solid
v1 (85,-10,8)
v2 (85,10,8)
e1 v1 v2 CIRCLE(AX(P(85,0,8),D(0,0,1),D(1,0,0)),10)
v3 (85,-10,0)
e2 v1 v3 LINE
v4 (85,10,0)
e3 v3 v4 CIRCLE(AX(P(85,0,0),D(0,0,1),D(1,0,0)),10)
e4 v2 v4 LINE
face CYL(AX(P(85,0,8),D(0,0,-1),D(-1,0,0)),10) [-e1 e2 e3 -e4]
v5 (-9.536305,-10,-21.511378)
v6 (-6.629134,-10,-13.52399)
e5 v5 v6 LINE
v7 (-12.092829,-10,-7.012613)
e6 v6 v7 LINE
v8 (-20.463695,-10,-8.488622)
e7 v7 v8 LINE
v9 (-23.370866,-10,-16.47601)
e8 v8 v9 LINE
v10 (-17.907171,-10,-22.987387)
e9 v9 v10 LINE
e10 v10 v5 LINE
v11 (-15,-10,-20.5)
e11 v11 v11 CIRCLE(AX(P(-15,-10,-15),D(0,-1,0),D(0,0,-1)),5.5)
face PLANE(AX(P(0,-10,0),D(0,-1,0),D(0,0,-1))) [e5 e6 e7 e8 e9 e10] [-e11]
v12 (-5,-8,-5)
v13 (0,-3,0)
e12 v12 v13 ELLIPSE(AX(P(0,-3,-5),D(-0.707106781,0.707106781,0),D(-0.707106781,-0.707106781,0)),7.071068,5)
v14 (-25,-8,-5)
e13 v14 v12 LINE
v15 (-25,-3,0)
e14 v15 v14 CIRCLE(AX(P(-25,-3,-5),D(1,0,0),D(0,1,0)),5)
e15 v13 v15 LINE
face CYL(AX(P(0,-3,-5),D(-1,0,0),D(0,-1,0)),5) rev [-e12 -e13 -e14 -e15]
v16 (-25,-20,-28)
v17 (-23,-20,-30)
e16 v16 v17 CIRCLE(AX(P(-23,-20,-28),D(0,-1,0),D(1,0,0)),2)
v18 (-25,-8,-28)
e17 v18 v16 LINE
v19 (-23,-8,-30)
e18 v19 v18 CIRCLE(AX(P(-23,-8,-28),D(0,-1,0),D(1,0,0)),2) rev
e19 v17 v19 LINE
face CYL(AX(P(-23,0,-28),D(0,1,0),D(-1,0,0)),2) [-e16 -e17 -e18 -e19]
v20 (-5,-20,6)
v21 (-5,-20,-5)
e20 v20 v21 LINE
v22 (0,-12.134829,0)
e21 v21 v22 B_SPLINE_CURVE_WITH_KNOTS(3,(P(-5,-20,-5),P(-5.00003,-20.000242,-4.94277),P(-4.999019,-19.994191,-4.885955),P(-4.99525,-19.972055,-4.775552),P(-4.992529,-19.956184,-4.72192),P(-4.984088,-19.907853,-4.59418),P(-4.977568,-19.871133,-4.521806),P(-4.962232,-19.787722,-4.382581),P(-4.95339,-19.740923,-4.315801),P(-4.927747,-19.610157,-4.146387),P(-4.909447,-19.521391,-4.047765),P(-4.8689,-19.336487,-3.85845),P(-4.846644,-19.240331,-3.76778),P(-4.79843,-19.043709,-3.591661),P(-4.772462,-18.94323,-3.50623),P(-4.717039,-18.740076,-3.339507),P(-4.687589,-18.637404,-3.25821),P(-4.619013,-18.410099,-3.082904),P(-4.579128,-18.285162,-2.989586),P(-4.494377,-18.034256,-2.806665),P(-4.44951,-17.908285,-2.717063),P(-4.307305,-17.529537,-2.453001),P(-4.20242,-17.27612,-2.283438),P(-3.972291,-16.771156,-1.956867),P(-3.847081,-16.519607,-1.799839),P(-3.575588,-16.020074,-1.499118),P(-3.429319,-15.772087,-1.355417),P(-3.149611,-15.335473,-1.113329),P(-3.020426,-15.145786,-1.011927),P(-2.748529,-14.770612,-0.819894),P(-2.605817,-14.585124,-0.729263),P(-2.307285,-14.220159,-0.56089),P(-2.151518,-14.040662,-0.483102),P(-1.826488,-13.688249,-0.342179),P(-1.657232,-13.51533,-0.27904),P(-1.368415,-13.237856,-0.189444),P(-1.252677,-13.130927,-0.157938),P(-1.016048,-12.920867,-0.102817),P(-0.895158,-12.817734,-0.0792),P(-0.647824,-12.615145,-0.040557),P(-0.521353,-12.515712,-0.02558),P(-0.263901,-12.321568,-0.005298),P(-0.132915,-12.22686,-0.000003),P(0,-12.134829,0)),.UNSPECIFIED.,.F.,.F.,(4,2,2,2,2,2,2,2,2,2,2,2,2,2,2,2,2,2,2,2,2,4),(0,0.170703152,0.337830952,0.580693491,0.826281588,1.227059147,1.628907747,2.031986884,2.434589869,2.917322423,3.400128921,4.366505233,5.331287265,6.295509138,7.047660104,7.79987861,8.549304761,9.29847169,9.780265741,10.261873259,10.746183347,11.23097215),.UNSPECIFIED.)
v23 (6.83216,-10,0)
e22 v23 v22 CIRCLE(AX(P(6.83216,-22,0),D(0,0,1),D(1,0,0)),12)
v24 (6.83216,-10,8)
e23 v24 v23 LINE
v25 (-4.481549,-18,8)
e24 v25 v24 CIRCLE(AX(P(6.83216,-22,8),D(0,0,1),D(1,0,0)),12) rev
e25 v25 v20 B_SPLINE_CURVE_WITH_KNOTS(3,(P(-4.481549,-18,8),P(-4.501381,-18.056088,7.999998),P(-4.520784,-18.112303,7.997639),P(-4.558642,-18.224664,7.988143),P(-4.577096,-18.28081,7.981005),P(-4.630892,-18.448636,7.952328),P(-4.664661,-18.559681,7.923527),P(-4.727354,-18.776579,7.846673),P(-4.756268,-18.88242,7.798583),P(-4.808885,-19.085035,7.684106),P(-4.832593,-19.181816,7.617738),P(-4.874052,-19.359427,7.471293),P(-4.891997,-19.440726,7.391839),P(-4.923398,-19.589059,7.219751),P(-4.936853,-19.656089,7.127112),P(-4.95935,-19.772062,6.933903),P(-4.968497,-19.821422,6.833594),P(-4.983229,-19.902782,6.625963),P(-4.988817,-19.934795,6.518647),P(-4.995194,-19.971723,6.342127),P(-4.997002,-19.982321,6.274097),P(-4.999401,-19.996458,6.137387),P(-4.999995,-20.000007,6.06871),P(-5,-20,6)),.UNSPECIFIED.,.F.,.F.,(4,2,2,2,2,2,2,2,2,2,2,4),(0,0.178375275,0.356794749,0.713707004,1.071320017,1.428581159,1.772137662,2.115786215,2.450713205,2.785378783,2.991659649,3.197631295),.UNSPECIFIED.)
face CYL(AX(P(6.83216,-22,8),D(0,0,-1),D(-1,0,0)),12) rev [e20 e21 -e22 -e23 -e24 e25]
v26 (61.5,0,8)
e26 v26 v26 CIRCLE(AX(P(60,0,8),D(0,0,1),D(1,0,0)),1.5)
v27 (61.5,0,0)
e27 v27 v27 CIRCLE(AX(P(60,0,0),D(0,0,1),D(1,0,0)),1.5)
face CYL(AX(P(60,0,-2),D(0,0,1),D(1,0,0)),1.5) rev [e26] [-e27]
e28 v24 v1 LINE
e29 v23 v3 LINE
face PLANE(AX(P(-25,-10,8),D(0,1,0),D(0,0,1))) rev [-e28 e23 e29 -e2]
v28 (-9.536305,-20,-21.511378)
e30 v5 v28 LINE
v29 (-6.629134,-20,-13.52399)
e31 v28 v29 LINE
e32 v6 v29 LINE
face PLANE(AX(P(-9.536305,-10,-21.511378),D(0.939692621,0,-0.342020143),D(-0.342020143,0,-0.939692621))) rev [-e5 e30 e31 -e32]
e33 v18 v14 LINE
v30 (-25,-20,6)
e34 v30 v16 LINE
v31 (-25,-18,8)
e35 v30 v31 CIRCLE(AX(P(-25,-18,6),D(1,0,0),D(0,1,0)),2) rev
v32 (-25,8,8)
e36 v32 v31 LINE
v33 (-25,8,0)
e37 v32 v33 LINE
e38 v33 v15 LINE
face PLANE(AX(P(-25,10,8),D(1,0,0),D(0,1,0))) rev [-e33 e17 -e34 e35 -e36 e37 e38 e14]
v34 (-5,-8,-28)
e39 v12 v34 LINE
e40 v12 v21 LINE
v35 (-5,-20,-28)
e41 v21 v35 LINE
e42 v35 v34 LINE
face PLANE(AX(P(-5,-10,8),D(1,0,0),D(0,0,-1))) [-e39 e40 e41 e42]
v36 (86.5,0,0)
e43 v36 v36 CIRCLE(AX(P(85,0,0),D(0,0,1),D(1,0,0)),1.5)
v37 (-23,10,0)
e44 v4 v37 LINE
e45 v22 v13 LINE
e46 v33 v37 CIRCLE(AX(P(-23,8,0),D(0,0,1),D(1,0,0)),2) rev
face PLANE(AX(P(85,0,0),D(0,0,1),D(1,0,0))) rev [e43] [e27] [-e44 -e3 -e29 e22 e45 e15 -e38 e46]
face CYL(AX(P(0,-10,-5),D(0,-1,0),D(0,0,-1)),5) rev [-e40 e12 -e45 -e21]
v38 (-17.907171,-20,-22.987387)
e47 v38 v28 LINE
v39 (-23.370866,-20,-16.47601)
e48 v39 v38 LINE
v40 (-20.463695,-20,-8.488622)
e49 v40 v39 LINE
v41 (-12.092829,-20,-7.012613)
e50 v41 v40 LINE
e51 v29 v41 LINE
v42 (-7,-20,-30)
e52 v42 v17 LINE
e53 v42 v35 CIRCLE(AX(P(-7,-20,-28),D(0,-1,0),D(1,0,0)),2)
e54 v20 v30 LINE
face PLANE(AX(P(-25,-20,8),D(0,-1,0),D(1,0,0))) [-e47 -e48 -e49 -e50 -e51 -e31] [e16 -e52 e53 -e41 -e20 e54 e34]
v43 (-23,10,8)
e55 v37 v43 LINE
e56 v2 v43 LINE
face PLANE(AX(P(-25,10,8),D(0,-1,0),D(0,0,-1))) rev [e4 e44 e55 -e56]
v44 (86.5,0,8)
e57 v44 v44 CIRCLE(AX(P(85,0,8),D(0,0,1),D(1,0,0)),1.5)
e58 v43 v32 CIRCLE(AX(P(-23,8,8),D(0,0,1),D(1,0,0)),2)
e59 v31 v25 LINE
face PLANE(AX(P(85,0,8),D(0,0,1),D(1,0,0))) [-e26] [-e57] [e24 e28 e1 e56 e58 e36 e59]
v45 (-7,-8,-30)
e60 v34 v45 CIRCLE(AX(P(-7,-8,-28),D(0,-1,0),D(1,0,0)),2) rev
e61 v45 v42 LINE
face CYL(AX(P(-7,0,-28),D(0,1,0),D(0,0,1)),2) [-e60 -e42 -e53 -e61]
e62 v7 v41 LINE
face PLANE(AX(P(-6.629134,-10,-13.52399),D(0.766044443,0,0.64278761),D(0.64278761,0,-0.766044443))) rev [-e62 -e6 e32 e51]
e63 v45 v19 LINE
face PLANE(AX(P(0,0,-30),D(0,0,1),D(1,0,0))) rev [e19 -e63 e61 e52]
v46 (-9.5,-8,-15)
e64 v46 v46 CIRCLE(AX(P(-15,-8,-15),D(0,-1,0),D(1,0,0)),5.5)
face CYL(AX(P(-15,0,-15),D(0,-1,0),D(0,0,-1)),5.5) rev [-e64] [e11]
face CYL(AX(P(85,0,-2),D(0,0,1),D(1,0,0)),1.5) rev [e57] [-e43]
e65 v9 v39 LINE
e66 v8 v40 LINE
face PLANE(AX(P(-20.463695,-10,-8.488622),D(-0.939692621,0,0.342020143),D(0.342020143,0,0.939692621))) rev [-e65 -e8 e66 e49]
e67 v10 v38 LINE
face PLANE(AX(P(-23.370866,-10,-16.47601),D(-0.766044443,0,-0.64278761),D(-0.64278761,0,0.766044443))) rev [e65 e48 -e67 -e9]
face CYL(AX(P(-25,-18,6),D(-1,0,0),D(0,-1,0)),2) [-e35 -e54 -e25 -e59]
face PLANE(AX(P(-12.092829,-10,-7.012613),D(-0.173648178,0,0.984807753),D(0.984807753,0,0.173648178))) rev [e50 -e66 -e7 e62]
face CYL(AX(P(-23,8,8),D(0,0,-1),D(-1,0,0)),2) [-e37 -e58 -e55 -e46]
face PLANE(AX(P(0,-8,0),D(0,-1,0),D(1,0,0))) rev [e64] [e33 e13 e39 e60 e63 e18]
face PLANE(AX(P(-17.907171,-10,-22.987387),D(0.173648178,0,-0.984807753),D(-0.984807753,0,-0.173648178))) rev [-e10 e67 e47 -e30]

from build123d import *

# Parameters (mm, degrees)
BOSS_EXTRUDE1_DEPTH      = 8
SKETCH2_R                = 1.5
CUT_EXTRUDE1_DEPTH       = 10
BOSS_EXTRUDE3_DEPTH      = 30
BOSS_EXTRUDE3_DEPTH_BACK = 8
SKETCH6_W                = 20
SKETCH6_H                = 10
FILLET3_R                = 12
SKETCH7_W                = 20
SKETCH7_H                = 30
BOSS_EXTRUDE4_DEPTH      = 2
CUT_EXTRUDE3_DEPTH       = 10
SKETCH9_R                = 5.5
CUT_EXTRUDE4_DEPTH       = 10
FILLET4_R                = 5
FILLET5_R                = 2
SKETCH10_R               = 1.5
CUT_EXTRUDE5_DEPTH       = 10


with BuildPart() as part:
    # Sketch1 → Boss-Extrude1 (new body)
    with BuildSketch(Plane.XY):
        with BuildLine():
            Line((-25, 10), (85, 10))
            ThreePointArc((85, 10), (95, 0), (85, -10))
            Line((85, -10), (-25, -10))
            Line((-25, -10), (-25, 10))
        make_face()
    extrude(amount=BOSS_EXTRUDE1_DEPTH)

    # Sketch2 → Cut-Extrude1 (cut)
    with BuildSketch(Plane.XY.offset(8)):
        with Locations((85, 0)):
            Circle(SKETCH2_R)
    extrude(amount=-CUT_EXTRUDE1_DEPTH, mode=Mode.SUBTRACT)

    # Sketch6 → Boss-Extrude3 (add, two sides: drawn at the far end of the back side and taken through both)
    with BuildSketch(Plane(origin=(0, 0, 0), x_dir=(-1, 0, 0), z_dir=(0, 0, -1)).offset(-BOSS_EXTRUDE3_DEPTH_BACK)):
        with Locations((15, -15)):
            Rectangle(SKETCH6_W, SKETCH6_H)
    extrude(amount=BOSS_EXTRUDE3_DEPTH + BOSS_EXTRUDE3_DEPTH_BACK)

    # Fillet3
    # the kernel refuses this fillet: 12 mm, written as the material it adds along each edge
    with BuildSketch(Plane(origin=(-5, -10, 8), x_dir=(0, -1, 0), z_dir=(0, 0, -1))) as fillet3_piece_1:
        with BuildLine():
            CenterArc((12, -11.832159566), FILLET3_R, 99.594068227, 80.405931773)
            Line((0, -11.832159566), (0, 0))
            Line((0, 0), (10, 0))
        make_face()
    extrude(amount=8)

    # Sketch7 → Boss-Extrude4 (add)
    with BuildSketch(Plane(origin=(0, -10, 0), x_dir=(1, 0, 0), z_dir=(0, 1, 0))):
        with Locations((-15, 15)):
            Rectangle(SKETCH7_W, SKETCH7_H)
    extrude(amount=BOSS_EXTRUDE4_DEPTH)

    # Sketch8 → Cut-Extrude3 (cut)
    with BuildSketch(Plane.XZ.offset(20)):
        Polygon((-12.092828782, -7.012612723), (-20.463694682, -8.488622233), (-23.370865901, -16.47600951), (-17.907171218, -22.987387277), (-9.536305318, -21.511377767), (-6.629134099, -13.52399049), align=None)
    extrude(amount=-CUT_EXTRUDE3_DEPTH, mode=Mode.SUBTRACT)

    # Sketch9 → Cut-Extrude4 (cut)
    with BuildSketch(Plane.XZ.offset(10)):
        with Locations(Location((-15, -15, 0), (0, 0, 270))):
            Circle(SKETCH9_R)
    extrude(amount=-CUT_EXTRUDE4_DEPTH, mode=Mode.SUBTRACT)

    # Fillet4
    # the kernel refuses this fillet: 5 mm, written as the material it adds along each edge
    with BuildSketch(Plane(origin=(-5, -20, 0), x_dir=(1, 0, 0), z_dir=(0, 1, 0))) as fillet4_piece_1_section:
        with BuildLine():
            CenterArc((FILLET4_R, FILLET4_R), FILLET4_R, 180, 90)
            Line((0, FILLET4_R), (0, 0))
            Line((0, 0), (FILLET4_R, 0))
        make_face()
    fillet4_piece_1 = extrude(amount=12, mode=Mode.PRIVATE)
    fillet4_piece_1 = fillet4_piece_1 - Plane(origin=(6.832159566, -22, 0), x_dir=(0, -1, 0), z_dir=(0, 0, 1)) * Cylinder(12, 44, mode=Mode.PRIVATE)
    add(fillet4_piece_1)
    with BuildSketch(Plane(origin=(-25, -8, 0), x_dir=(0, 1, 0), z_dir=(1, 0, 0))) as fillet4_piece_2:
        with BuildLine():
            CenterArc((FILLET4_R, -FILLET4_R), FILLET4_R, 90, 90)
            Line((0, -FILLET4_R), (0, 0))
            Line((0, 0), (FILLET4_R, 0))
        make_face()
    extrude(amount=20)
    with BuildSketch(Plane(origin=(-5, -20, 0), x_dir=(1, 0, 0), z_dir=(0, 1, 0))) as fillet4_piece_3a_section:
        with BuildLine():
            CenterArc((FILLET4_R, FILLET4_R), FILLET4_R, 180, 90)
            Line((0, FILLET4_R), (0, 0))
            Line((0, 0), (FILLET4_R, 0))
        make_face()
    fillet4_piece_3a = extrude(amount=24.5, mode=Mode.PRIVATE)
    fillet4_piece_3a = split(fillet4_piece_3a, bisect_by=Plane(origin=(-5, -8, 0), z_dir=(0, 1, 0)), keep=Keep.TOP, mode=Mode.PRIVATE)
    with BuildSketch(Plane(origin=(-25, -8, 0), x_dir=(0, 1, 0), z_dir=(1, 0, 0))) as fillet4_piece_3b_section:
        with BuildLine():
            CenterArc((FILLET4_R, -FILLET4_R), FILLET4_R, 90, 90)
            Line((0, -FILLET4_R), (0, 0))
            Line((0, 0), (FILLET4_R, 0))
        make_face()
    fillet4_piece_3b = extrude(amount=32.5, mode=Mode.PRIVATE)
    fillet4_piece_3b = split(fillet4_piece_3b, bisect_by=Plane(origin=(-5, -8, 0), z_dir=(1, 0, 0)), keep=Keep.TOP, mode=Mode.PRIVATE)
    fillet4_piece_3 = fillet4_piece_3a & fillet4_piece_3b
    add(fillet4_piece_3)

    # Fillet5
    fillet5_edges = [part.edges().sort_by_distance(p)[0] for p in [
        (-15, -20, 8),
        (-25, -14, -30),
        (-5, -14, -30),
        (-25, 10, 4),
    ]]
    fillet(fillet5_edges, radius=FILLET5_R)

    # Sketch10 → Cut-Extrude5 (cut)
    with BuildSketch(Plane.XY.offset(8)):
        with Locations((60, 0)):
            Circle(SKETCH10_R)
    extrude(amount=-CUT_EXTRUDE5_DEPTH, mode=Mode.SUBTRACT)


solid = part.part
